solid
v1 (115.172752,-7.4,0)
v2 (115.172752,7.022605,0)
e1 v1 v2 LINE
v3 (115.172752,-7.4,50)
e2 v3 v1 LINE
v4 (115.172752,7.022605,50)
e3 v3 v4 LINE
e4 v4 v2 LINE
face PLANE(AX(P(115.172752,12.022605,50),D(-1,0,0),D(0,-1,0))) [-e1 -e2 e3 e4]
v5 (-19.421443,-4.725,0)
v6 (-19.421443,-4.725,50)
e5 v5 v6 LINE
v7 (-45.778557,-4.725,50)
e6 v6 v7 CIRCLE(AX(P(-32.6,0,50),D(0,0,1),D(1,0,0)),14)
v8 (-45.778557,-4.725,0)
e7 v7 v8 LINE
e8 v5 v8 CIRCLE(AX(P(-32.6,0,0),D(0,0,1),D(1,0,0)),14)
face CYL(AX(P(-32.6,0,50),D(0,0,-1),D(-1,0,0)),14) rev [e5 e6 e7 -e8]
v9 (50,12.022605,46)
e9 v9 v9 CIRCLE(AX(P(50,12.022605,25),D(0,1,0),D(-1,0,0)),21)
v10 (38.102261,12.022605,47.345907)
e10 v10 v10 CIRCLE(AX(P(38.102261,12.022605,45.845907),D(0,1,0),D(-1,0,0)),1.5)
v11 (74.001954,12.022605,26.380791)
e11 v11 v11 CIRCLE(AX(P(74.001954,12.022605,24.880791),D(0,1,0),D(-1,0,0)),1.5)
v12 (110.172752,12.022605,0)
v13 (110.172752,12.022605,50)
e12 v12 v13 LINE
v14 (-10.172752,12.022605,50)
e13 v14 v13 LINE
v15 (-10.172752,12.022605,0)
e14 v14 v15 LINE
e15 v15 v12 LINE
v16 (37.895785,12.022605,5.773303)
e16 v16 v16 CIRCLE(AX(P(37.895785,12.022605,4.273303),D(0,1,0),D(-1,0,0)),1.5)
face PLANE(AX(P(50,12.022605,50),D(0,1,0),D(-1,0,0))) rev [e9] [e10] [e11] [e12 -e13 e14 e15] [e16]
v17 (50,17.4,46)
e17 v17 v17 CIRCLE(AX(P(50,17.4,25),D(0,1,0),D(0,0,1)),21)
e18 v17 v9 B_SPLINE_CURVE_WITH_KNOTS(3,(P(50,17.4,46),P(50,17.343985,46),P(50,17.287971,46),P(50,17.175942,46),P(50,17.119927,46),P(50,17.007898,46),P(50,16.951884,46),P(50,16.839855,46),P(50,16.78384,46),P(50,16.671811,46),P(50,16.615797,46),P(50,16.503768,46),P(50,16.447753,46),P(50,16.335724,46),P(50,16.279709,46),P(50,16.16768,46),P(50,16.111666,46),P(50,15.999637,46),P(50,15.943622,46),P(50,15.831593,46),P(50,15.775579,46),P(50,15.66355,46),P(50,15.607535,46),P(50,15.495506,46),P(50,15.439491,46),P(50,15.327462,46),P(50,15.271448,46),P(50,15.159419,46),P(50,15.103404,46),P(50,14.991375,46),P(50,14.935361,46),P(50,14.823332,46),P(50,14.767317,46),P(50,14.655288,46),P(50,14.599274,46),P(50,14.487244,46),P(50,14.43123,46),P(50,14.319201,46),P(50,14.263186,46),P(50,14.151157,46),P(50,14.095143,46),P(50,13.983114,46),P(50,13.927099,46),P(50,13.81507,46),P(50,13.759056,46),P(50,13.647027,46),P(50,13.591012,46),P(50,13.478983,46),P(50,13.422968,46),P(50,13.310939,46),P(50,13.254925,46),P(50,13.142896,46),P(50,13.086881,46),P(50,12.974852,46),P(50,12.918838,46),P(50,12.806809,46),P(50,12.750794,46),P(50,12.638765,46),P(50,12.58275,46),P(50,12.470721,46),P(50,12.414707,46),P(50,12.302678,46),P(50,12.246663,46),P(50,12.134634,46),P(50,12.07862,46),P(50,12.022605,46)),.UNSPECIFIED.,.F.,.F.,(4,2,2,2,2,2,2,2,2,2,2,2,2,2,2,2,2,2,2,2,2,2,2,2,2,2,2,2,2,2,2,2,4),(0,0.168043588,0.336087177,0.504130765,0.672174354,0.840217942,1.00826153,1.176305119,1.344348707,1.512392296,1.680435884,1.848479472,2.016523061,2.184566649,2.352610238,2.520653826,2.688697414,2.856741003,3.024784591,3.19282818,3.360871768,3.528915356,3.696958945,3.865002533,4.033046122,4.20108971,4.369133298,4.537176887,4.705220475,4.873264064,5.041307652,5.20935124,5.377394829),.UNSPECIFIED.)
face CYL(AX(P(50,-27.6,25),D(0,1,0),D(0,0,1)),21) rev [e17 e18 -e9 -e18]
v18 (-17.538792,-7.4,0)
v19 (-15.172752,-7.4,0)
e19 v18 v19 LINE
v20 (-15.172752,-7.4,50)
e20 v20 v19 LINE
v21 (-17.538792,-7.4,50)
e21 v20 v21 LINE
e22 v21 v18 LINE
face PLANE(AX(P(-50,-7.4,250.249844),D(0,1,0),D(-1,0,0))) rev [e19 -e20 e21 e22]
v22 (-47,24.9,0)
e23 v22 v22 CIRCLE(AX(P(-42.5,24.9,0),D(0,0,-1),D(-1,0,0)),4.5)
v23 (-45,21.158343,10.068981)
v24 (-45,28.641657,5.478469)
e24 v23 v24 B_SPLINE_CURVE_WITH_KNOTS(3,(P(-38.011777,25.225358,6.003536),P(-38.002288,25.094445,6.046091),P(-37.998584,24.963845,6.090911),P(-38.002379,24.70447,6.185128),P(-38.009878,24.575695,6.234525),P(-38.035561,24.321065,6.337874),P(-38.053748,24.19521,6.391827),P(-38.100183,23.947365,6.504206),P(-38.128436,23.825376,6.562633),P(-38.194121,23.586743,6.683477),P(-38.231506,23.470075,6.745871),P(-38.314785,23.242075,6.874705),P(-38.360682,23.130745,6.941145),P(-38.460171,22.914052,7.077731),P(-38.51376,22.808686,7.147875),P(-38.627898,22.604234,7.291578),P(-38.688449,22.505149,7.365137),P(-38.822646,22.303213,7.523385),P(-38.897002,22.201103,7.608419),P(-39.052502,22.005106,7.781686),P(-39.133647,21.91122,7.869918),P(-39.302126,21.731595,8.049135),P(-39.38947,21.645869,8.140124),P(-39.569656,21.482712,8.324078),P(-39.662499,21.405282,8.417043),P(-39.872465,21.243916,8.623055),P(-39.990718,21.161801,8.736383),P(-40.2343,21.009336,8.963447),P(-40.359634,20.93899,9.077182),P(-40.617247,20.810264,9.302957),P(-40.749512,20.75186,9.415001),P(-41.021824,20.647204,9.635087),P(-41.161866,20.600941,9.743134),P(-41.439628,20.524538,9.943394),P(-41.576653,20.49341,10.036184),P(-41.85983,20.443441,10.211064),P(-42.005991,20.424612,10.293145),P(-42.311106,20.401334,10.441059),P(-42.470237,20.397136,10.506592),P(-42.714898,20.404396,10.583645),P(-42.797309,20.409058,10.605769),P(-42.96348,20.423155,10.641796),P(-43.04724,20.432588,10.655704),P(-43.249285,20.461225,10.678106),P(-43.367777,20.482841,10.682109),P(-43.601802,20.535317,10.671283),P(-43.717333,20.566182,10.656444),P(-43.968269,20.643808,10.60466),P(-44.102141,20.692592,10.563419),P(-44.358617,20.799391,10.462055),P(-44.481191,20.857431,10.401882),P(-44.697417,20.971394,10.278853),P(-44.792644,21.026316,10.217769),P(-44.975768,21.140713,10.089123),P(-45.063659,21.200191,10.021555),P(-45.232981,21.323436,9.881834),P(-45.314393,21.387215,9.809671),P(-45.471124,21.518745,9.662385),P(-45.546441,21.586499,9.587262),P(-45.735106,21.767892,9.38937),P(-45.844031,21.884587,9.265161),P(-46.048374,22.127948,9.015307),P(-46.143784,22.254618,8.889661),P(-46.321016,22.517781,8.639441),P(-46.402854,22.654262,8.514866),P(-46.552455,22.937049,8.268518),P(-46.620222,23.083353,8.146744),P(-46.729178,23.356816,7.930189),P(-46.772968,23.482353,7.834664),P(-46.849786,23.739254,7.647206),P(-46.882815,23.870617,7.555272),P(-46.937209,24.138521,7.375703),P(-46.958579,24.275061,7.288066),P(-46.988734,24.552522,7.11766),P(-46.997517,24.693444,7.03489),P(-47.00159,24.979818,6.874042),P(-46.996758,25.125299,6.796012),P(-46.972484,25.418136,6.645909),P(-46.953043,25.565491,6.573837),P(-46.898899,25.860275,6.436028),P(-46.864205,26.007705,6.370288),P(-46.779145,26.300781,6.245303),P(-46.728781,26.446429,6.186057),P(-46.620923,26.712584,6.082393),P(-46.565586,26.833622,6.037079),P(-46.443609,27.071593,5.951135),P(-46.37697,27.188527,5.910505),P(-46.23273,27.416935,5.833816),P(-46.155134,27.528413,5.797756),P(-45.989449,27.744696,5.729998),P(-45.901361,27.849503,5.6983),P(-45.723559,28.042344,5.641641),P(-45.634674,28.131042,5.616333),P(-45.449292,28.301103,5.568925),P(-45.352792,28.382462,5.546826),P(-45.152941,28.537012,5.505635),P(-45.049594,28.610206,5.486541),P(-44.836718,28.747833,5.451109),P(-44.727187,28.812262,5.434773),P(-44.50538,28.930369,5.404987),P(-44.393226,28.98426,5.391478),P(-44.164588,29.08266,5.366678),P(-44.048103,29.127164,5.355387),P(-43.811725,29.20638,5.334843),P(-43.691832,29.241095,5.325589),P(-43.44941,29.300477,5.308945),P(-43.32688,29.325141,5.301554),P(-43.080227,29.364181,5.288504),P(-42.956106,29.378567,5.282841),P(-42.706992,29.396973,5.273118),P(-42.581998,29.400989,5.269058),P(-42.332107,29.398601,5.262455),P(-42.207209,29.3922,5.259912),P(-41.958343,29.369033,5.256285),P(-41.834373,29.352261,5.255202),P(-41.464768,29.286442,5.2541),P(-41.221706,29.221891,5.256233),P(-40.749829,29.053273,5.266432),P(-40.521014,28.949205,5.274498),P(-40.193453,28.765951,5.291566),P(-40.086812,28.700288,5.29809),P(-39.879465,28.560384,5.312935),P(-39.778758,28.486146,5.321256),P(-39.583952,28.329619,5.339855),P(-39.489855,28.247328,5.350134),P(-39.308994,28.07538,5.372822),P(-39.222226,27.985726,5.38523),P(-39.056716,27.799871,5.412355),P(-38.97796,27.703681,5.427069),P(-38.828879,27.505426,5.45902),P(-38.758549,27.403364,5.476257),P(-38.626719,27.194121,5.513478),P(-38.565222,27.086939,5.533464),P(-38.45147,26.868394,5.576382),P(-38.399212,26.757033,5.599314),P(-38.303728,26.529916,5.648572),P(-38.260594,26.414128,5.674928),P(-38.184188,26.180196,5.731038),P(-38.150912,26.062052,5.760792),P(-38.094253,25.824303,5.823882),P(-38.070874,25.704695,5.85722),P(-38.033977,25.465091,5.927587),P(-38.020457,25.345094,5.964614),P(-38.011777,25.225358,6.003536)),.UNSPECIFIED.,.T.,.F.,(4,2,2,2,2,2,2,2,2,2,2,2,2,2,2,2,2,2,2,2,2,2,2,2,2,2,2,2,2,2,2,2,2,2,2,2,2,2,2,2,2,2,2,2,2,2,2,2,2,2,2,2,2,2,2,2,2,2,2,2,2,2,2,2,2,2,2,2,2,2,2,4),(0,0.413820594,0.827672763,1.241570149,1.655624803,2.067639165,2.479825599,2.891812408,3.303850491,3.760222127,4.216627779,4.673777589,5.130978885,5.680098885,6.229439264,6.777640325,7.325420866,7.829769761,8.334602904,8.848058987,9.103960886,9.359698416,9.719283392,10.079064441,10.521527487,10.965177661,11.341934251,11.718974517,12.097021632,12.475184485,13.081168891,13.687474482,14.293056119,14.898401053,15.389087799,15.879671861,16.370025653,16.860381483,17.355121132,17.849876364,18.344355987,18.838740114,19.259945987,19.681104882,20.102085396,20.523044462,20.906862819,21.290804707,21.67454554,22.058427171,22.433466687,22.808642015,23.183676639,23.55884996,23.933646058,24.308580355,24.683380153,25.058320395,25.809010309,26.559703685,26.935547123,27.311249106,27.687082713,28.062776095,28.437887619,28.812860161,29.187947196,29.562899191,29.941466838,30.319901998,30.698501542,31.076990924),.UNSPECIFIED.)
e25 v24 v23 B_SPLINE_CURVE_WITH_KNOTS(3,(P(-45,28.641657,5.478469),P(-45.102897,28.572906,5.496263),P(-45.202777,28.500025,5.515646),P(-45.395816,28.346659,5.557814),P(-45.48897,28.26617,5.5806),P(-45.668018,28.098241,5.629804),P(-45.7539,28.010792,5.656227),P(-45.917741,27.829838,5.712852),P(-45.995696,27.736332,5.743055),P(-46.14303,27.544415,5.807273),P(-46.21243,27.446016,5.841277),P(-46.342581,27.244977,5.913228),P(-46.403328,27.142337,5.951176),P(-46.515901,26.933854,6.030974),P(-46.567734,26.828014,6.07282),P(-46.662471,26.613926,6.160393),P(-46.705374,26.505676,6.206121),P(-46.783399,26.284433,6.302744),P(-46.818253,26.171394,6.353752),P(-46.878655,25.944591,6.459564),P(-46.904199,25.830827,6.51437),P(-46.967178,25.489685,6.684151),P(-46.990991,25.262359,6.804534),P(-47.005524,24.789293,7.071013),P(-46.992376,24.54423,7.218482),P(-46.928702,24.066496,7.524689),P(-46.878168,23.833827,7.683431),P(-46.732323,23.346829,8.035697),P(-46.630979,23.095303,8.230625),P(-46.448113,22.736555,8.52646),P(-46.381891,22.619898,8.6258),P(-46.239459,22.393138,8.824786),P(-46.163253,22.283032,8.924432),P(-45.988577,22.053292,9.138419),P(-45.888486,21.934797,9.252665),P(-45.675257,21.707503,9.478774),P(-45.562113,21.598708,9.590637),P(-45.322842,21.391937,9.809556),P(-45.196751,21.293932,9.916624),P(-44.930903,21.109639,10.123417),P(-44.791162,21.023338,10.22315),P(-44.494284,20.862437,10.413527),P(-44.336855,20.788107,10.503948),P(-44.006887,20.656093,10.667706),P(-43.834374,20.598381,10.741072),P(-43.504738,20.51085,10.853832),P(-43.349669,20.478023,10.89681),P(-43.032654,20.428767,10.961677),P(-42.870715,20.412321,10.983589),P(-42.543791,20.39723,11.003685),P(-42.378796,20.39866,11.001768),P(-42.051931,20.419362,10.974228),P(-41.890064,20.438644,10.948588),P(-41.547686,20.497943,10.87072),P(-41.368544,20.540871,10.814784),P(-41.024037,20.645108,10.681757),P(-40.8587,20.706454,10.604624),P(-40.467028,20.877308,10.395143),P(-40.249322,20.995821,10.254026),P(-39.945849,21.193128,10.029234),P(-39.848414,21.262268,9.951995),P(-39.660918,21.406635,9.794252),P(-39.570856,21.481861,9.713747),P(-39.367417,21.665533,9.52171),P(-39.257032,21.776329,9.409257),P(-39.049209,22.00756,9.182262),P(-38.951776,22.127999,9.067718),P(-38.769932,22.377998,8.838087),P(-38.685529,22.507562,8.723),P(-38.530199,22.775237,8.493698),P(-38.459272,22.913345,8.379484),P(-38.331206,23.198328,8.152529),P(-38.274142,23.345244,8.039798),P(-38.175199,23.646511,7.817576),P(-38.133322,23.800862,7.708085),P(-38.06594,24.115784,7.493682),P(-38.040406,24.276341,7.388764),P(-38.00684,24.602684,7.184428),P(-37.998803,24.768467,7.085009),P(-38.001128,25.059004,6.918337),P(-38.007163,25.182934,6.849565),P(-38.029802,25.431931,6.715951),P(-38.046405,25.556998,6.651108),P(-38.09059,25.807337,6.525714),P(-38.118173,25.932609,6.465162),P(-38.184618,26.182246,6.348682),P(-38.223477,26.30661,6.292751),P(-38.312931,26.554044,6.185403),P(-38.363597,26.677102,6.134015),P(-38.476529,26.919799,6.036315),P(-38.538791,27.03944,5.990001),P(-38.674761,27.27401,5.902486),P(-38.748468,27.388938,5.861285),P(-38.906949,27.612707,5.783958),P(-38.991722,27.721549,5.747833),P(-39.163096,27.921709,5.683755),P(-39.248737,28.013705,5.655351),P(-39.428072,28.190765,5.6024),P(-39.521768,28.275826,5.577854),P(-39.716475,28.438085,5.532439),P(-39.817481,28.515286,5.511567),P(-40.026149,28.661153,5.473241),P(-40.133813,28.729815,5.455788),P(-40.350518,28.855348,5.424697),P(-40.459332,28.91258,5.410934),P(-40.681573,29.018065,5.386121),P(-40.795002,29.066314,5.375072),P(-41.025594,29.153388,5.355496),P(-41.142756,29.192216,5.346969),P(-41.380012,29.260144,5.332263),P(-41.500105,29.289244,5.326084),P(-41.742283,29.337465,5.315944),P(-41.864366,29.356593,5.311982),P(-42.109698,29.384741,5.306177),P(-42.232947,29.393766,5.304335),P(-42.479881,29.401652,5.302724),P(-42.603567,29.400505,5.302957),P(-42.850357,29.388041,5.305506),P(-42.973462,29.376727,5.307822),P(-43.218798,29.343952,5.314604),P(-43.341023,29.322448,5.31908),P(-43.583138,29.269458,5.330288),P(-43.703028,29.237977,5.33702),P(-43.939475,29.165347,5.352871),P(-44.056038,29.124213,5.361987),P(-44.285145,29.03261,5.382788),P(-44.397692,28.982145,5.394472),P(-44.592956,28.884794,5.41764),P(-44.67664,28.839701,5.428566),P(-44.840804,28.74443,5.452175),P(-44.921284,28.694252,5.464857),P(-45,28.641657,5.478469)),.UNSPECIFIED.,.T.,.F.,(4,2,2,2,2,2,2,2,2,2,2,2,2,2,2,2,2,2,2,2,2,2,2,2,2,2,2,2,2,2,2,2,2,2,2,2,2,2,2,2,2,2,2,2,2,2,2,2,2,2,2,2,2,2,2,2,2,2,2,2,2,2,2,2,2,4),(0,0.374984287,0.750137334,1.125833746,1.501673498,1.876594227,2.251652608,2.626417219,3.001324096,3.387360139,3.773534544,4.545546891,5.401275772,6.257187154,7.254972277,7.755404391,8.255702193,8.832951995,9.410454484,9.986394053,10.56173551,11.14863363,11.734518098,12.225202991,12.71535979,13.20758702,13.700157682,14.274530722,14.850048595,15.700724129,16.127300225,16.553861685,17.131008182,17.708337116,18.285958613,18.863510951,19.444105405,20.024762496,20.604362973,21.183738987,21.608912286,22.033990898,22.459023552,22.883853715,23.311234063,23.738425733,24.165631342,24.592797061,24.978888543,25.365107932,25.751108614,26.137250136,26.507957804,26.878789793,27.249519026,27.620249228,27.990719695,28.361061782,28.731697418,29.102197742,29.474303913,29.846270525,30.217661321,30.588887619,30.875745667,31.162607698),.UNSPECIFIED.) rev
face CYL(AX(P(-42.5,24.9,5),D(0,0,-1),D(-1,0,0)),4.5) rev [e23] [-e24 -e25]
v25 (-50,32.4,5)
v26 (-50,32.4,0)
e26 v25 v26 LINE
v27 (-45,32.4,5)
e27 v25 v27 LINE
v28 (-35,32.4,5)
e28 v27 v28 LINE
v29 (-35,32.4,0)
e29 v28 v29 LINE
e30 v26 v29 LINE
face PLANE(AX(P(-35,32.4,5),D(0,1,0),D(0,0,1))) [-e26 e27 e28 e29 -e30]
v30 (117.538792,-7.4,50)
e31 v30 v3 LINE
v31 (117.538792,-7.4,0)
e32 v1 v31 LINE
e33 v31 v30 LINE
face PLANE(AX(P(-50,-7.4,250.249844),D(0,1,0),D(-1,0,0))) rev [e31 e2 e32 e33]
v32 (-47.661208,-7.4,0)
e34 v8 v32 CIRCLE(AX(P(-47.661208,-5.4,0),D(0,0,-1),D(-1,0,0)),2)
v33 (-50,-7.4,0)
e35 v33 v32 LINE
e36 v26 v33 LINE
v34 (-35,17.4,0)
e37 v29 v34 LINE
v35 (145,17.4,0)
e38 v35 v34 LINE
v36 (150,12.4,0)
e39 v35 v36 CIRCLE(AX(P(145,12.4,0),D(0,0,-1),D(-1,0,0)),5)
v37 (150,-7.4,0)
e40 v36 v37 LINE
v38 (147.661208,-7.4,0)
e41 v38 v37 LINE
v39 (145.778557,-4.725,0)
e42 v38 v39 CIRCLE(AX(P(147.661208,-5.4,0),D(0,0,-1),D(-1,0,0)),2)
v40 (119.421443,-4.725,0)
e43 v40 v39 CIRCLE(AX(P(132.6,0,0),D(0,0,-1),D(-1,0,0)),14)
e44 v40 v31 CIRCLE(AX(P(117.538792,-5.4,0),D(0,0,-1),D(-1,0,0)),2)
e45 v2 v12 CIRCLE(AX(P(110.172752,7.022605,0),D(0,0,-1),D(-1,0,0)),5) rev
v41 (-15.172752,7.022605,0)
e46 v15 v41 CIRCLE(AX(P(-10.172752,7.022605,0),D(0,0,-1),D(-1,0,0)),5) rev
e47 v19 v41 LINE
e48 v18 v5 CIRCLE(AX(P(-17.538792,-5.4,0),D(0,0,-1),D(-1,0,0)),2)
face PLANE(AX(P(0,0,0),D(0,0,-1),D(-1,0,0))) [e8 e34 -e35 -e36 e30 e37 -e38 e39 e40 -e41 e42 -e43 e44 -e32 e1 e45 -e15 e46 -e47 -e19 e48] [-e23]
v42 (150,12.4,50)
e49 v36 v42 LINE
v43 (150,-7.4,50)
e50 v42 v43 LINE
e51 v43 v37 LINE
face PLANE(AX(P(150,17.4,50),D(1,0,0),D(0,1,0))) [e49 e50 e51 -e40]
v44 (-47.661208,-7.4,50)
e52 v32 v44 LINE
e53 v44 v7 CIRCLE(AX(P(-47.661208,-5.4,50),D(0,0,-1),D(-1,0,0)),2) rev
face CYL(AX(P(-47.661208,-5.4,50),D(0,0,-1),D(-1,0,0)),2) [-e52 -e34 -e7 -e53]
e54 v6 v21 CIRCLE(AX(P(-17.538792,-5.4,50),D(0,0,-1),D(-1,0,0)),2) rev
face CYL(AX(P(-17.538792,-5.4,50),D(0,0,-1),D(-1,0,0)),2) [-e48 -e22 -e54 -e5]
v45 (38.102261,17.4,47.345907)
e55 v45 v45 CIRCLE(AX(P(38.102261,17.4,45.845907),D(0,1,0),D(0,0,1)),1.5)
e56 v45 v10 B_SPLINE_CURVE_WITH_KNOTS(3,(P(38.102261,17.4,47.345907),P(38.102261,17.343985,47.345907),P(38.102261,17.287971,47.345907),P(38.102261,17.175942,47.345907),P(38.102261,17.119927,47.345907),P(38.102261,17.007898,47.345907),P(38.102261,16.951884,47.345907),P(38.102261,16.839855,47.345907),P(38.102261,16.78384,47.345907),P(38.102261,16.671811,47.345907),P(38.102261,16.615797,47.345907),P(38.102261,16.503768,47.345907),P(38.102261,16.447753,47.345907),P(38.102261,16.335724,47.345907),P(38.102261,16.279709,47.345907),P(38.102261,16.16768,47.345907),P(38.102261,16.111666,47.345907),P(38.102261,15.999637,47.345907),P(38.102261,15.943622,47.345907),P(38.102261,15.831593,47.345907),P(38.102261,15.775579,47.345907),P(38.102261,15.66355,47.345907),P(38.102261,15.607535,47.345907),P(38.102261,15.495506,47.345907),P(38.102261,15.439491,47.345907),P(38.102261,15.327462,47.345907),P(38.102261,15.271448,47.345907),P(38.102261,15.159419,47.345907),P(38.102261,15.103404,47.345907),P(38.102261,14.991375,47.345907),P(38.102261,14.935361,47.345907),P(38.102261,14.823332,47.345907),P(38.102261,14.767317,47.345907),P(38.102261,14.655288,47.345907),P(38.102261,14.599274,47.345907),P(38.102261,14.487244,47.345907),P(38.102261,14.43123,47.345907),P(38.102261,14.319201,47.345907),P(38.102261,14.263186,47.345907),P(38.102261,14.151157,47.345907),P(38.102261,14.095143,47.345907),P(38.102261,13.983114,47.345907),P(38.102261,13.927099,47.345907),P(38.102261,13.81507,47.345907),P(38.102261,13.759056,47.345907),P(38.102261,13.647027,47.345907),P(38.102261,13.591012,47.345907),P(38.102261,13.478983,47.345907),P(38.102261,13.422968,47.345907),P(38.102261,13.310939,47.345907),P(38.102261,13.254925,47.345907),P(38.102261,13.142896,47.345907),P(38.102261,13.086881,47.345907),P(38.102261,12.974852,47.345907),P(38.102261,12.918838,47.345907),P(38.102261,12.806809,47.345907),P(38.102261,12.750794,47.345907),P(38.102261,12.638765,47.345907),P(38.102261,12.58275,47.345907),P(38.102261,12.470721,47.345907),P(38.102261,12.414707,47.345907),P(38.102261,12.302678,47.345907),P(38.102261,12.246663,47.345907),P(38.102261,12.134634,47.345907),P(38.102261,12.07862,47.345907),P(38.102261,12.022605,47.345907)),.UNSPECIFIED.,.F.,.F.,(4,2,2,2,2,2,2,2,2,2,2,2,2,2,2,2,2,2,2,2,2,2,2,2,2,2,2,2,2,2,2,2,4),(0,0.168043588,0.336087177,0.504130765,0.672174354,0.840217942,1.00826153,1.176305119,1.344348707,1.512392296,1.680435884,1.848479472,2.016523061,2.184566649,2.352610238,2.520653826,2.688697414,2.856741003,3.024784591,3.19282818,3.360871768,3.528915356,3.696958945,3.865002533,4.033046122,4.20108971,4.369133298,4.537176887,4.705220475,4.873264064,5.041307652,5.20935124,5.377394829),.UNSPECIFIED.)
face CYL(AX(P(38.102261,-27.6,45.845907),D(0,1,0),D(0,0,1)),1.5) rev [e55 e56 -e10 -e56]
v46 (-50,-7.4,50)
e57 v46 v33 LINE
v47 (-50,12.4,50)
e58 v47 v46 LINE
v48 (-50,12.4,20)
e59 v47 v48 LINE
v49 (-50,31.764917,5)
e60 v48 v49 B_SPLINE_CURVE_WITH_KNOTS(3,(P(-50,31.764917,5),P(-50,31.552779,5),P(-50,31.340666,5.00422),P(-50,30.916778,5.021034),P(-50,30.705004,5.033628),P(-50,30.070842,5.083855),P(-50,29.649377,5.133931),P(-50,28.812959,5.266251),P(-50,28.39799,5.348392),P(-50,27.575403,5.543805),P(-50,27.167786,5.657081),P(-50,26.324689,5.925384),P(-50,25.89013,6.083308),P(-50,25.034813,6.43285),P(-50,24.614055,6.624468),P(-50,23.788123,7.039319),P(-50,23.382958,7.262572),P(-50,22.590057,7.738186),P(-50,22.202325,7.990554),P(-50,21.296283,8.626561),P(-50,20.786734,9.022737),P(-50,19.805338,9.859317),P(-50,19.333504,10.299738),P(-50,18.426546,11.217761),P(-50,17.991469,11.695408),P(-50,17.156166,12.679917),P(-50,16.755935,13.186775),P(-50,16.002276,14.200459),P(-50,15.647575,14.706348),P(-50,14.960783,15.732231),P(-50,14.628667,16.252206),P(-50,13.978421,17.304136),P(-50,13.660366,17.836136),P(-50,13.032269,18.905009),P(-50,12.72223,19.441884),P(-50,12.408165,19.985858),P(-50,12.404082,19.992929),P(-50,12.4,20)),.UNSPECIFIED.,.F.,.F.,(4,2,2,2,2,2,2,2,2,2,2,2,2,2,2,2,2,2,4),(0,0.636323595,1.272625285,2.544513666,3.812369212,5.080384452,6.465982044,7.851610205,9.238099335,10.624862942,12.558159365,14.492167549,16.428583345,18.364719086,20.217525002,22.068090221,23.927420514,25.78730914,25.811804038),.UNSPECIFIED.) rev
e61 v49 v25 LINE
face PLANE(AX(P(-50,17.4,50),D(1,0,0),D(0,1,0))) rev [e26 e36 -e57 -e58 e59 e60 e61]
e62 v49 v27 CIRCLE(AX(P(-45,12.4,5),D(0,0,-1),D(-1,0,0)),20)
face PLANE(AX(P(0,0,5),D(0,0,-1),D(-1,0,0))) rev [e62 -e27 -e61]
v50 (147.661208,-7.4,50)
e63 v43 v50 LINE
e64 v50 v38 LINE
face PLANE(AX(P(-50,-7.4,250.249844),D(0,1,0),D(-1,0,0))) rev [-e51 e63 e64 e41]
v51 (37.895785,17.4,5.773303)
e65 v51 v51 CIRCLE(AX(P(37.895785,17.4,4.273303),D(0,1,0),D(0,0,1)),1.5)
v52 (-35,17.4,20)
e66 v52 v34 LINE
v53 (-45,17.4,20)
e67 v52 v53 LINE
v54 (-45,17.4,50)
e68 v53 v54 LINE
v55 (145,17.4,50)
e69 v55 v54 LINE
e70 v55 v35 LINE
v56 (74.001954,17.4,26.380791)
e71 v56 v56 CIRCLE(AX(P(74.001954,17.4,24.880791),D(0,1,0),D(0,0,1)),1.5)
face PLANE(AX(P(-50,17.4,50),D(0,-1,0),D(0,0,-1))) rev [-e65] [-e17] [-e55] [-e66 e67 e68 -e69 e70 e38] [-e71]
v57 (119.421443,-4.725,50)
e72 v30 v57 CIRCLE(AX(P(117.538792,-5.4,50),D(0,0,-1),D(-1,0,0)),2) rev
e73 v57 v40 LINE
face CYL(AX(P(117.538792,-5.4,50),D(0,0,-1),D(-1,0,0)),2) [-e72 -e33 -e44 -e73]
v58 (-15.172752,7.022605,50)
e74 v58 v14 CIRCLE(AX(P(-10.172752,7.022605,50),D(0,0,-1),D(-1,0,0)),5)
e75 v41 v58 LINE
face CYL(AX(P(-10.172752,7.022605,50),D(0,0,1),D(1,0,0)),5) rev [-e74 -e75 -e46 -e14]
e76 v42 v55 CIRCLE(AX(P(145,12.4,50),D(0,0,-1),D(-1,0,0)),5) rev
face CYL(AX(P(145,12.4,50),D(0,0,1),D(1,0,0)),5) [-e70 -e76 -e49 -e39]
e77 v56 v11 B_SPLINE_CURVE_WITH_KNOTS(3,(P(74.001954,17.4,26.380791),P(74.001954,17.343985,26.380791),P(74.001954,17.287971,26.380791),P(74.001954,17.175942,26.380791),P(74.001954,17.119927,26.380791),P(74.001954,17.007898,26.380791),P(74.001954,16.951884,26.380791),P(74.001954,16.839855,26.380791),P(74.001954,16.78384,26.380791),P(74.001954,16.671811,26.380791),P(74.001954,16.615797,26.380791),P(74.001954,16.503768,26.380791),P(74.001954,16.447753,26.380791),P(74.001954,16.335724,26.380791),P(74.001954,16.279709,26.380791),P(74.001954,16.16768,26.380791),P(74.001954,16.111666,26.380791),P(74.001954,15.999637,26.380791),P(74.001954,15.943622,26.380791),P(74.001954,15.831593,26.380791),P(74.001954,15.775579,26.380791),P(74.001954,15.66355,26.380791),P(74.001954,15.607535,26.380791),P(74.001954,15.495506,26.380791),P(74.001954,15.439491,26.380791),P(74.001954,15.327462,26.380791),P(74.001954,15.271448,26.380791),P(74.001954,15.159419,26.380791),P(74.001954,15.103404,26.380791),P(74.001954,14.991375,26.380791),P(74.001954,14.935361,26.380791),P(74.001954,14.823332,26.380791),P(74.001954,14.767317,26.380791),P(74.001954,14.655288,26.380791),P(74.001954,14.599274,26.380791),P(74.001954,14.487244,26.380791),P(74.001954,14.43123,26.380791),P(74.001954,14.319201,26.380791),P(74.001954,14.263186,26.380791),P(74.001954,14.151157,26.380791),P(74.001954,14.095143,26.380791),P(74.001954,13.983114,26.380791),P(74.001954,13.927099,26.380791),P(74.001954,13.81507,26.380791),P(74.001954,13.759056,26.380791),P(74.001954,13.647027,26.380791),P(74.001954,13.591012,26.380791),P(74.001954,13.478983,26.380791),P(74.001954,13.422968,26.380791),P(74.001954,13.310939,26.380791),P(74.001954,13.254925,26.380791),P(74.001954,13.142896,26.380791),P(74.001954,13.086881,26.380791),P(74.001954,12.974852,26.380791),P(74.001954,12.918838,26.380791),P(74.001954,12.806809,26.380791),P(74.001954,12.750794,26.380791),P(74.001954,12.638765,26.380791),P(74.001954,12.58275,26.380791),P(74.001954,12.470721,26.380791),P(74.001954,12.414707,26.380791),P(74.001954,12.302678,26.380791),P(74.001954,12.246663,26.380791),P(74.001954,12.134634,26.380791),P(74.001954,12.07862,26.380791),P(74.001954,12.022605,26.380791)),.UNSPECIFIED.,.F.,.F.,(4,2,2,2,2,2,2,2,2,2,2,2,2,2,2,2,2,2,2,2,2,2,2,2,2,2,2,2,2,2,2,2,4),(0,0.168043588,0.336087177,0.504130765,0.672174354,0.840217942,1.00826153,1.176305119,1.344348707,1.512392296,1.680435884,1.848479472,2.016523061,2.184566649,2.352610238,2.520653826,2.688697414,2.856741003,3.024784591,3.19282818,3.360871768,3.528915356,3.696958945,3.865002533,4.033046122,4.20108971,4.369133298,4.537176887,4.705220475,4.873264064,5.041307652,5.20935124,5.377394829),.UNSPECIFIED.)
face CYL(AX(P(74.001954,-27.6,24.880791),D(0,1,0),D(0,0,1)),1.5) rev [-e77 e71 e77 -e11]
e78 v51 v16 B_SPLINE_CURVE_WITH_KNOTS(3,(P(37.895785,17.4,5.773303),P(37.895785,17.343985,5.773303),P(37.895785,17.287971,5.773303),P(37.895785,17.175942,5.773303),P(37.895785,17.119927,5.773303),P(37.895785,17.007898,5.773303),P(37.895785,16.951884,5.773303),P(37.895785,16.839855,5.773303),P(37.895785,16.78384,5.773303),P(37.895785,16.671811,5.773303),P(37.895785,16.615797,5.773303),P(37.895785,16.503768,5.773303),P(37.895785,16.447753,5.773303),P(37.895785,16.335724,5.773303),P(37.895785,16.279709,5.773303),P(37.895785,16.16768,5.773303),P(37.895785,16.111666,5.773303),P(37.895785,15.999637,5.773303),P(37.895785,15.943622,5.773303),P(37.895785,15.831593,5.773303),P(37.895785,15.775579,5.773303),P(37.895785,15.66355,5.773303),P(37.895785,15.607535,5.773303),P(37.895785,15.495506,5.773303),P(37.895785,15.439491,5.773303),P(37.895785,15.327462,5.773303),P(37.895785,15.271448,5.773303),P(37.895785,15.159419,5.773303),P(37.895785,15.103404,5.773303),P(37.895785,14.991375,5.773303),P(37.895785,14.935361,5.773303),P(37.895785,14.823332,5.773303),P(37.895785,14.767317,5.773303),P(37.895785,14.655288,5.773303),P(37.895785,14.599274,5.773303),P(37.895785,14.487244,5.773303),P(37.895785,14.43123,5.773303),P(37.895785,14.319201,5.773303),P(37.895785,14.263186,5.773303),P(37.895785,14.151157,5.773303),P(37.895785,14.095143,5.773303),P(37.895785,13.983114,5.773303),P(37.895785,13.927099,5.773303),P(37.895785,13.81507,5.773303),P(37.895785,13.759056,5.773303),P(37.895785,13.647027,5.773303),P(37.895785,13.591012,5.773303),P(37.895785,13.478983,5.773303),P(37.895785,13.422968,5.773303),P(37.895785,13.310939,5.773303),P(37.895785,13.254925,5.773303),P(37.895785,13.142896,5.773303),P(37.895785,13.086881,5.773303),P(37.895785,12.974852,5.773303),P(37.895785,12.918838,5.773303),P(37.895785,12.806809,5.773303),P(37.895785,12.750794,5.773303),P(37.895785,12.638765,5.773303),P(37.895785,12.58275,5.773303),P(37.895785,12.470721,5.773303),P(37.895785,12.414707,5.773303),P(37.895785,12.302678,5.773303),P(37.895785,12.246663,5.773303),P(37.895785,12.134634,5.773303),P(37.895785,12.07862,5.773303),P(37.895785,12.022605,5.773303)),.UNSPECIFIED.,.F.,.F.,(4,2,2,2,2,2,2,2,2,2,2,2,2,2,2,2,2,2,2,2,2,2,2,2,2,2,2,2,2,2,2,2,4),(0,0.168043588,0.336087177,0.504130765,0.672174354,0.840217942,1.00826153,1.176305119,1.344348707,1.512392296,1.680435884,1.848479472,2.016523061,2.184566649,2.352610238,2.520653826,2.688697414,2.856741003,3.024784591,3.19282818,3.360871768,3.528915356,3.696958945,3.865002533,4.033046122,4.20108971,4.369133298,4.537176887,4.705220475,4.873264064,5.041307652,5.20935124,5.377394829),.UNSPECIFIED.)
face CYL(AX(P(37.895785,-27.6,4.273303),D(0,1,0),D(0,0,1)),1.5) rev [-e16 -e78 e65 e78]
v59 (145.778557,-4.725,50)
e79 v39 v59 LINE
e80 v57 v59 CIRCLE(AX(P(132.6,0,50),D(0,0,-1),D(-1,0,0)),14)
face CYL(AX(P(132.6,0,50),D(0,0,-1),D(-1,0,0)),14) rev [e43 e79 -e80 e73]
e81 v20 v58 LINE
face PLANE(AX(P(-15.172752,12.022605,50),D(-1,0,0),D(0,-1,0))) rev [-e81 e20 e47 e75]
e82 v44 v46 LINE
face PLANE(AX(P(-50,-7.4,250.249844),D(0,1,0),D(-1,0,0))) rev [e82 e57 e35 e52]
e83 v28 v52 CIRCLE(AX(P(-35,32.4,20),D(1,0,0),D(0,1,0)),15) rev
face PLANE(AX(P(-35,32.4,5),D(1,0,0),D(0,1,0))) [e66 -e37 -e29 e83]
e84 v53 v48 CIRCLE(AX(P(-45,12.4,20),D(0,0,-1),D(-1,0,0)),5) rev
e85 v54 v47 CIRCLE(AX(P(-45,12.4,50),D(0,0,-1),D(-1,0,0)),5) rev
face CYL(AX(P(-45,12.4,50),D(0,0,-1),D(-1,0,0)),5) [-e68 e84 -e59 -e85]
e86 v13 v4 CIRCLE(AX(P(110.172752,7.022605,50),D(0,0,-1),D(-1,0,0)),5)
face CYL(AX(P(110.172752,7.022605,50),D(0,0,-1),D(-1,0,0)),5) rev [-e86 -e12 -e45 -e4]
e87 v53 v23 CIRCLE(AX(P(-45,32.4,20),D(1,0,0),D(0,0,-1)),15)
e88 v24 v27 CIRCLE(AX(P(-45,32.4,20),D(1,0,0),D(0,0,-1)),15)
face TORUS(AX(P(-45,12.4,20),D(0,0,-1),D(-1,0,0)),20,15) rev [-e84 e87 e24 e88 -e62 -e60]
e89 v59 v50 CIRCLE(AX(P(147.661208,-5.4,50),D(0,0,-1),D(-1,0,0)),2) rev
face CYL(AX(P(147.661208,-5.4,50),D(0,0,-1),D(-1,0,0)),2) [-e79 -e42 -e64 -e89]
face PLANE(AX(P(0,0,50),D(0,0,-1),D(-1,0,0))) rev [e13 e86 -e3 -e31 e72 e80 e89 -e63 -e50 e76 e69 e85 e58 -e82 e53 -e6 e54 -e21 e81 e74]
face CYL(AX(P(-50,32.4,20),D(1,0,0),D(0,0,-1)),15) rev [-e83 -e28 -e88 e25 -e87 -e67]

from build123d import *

# Parameters (mm, degrees)
SKETCH1_R           = 14
BOSS_EXTRUDE1_DEPTH = 50
SKETCH2_R           = 21
CUT_EXTRUDE1_DEPTH  = 45
SKETCH3_R           = 1.5
CUT_EXTRUDE2_DEPTH  = 45
SKETCH4_W           = 15
SKETCH4_H           = 15
BOSS_EXTRUDE2_DEPTH = 5
SKETCH5_R           = 4.5
CUT_EXTRUDE3_DEPTH  = 5
FILLET1_R           = 5
FILLET2_R           = 15
SKETCH7_W           = 200
SKETCH7_H           = 10
CUT_EXTRUDE4_DEPTH  = 50
FILLET3_R           = 2


with BuildPart() as part:
    # Sketch1 → Boss-Extrude1 (new body)
    with BuildSketch(Plane.XY):
        Polygon((-50, 17.4), (-15.2, 17.4), (50, 17.4), (50, 12.022605171), (-15.17275181, 12.022605171), (-15.17275181, -17.4), (-50, -17.4), align=None)
        with Locations((-32.6, 0)):
            Circle(SKETCH1_R, mode=Mode.SUBTRACT)
    boss_extrude1 = extrude(amount=BOSS_EXTRUDE1_DEPTH)

    # Mirror1: Boss-Extrude1 across plane
    add(boss_extrude1.mirror(Plane(origin=(50, 17.4, 50), x_dir=(0, 0, 1), z_dir=(-1, 0, 0))))

    # Sketch2 → Cut-Extrude1 (cut)
    with BuildSketch(Plane(origin=(0, 17.4, 0), x_dir=(1, 0, 0), z_dir=(0, 1, 0))):
        with Locations(Location((50, -25, 0), (0, 0, 270))):
            Circle(SKETCH2_R)
    extrude(amount=-CUT_EXTRUDE1_DEPTH, mode=Mode.SUBTRACT)

    # Sketch3 → Cut-Extrude2 (cut)
    with BuildSketch(Plane(origin=(0, 17.4, 0), x_dir=(1, 0, 0), z_dir=(0, 1, 0))):
        with Locations(Location((37.89578471, -4.273302643, 0), (0, 0, 270))):
            Circle(SKETCH3_R)
        with Locations(Location((74.001954093, -24.880790745, 0), (0, 0, 270))):
            Circle(SKETCH3_R)
        with Locations(Location((38.102261197, -45.845906612, 0), (0, 0, 270))):
            Circle(SKETCH3_R)
    extrude(amount=-CUT_EXTRUDE2_DEPTH, mode=Mode.SUBTRACT)

    # Sketch4 → Boss-Extrude2 (add)
    with BuildSketch(Plane(origin=(0, 0, 0), x_dir=(-1, 0, 0), z_dir=(0, 0, -1))):
        with Locations((42.5, 24.9)):
            Rectangle(SKETCH4_W, SKETCH4_H)
    extrude(amount=-BOSS_EXTRUDE2_DEPTH)

    # Sketch5 → Cut-Extrude3 (cut)
    with BuildSketch(Plane(origin=(0, 0, 0), x_dir=(-1, 0, 0), z_dir=(0, 0, -1))):
        with Locations((42.5, 24.9)):
            Circle(SKETCH5_R)
    extrude(amount=-CUT_EXTRUDE3_DEPTH, mode=Mode.SUBTRACT)

    # Fillet1
    fillet1_edges = [part.edges().sort_by_distance(p)[0] for p in [
        (-50, 17.4, 27.5),
        (-15.17275181, 12.022605171, 25),
        (-15.17275181, -17.4, 25),
        (-50, -17.4, 25),
        (150, -17.4, 25),
        (150, 17.4, 25),
        (115.17275181, 12.022605171, 25),
        (115.17275181, -17.4, 25),
    ]]
    fillet(fillet1_edges, radius=FILLET1_R)

    # Fillet2
    # the kernel refuses this fillet: 15 mm, written as the material it adds along each edge
    with BuildSketch(Plane(origin=(-45, 12.4, 5), x_dir=(0, 1, 0), z_dir=(1, 0, 0))) as fillet2_piece_1_section:
        with BuildLine():
            CenterArc((5 + FILLET2_R, FILLET2_R), FILLET2_R, 180, 90)
            Line((5 + FILLET2_R, 0), (5, 0))
            Line((5, 0), (5, FILLET2_R))
        make_face()
    fillet2_piece_1 = revolve(axis=Axis((-45, 12.4, 5), (0, 0, 1)), revolution_arc=359.64, mode=Mode.PRIVATE)
    fillet2_piece_1 = split(fillet2_piece_1, bisect_by=Plane(origin=(-50, 16.22028394, 10.678167657), z_dir=(1, 0, 0)), keep=Keep.TOP, mode=Mode.PRIVATE)
    fillet2_piece_1 = fillet2_piece_1 - Plane(origin=(-42.5, 24.9, 10.678167657), x_dir=(-1, 0, 0), z_dir=(0, 0, -1)) * Cylinder(4.5, 80, mode=Mode.PRIVATE)
    fillet2_piece_1 = fillet2_piece_1 - Plane(origin=(-32.6, 0, 10.678167657), x_dir=(1, 0, 0), z_dir=(0, 0, -1)) * Cylinder(14, 80, mode=Mode.PRIVATE)
    fillet2_piece_1 = split(fillet2_piece_1, bisect_by=Plane(origin=(-35, 16.22028394, 10.678167657), z_dir=(-1, 0, 0)), keep=Keep.TOP, mode=Mode.PRIVATE)
    add(fillet2_piece_1)
    with BuildSketch(Plane(origin=(-45, 17.4, 5), x_dir=(0, 0, 1), z_dir=(1, 0, 0))) as fillet2_piece_2_section:
        with BuildLine():
            CenterArc((FILLET2_R, -FILLET2_R), FILLET2_R, 90, 90)
            Line((0, -FILLET2_R), (0, 0))
            Line((0, 0), (FILLET2_R, 0))
        make_face()
    fillet2_piece_2 = extrude(amount=10, mode=Mode.PRIVATE)
    fillet2_piece_2 = fillet2_piece_2 - Plane(origin=(-42.5, 24.9, 8.942844525), x_dir=(-1, 0, 0), z_dir=(0, 0, -1)) * Cylinder(4.5, 80, mode=Mode.PRIVATE)
    add(fillet2_piece_2)

    # Sketch7 → Cut-Extrude4 (cut)
    with BuildSketch(Plane(origin=(0, 0, 0), x_dir=(-1, 0, 0), z_dir=(0, 0, -1))):
        with Locations((-50, -12.4)):
            Rectangle(SKETCH7_W, SKETCH7_H)
    extrude(amount=-CUT_EXTRUDE4_DEPTH, mode=Mode.SUBTRACT)

    # Fillet3
    fillet3_edges = [part.edges().sort_by_distance(p)[0] for p in [
        (120.715556387, -7.4, 25),
        (144.484443613, -7.4, 25),
        (-20.715556387, -7.4, 25),
        (-44.484443613, -7.4, 25),
    ]]
    fillet(fillet3_edges, radius=FILLET3_R)


solid = part.part
